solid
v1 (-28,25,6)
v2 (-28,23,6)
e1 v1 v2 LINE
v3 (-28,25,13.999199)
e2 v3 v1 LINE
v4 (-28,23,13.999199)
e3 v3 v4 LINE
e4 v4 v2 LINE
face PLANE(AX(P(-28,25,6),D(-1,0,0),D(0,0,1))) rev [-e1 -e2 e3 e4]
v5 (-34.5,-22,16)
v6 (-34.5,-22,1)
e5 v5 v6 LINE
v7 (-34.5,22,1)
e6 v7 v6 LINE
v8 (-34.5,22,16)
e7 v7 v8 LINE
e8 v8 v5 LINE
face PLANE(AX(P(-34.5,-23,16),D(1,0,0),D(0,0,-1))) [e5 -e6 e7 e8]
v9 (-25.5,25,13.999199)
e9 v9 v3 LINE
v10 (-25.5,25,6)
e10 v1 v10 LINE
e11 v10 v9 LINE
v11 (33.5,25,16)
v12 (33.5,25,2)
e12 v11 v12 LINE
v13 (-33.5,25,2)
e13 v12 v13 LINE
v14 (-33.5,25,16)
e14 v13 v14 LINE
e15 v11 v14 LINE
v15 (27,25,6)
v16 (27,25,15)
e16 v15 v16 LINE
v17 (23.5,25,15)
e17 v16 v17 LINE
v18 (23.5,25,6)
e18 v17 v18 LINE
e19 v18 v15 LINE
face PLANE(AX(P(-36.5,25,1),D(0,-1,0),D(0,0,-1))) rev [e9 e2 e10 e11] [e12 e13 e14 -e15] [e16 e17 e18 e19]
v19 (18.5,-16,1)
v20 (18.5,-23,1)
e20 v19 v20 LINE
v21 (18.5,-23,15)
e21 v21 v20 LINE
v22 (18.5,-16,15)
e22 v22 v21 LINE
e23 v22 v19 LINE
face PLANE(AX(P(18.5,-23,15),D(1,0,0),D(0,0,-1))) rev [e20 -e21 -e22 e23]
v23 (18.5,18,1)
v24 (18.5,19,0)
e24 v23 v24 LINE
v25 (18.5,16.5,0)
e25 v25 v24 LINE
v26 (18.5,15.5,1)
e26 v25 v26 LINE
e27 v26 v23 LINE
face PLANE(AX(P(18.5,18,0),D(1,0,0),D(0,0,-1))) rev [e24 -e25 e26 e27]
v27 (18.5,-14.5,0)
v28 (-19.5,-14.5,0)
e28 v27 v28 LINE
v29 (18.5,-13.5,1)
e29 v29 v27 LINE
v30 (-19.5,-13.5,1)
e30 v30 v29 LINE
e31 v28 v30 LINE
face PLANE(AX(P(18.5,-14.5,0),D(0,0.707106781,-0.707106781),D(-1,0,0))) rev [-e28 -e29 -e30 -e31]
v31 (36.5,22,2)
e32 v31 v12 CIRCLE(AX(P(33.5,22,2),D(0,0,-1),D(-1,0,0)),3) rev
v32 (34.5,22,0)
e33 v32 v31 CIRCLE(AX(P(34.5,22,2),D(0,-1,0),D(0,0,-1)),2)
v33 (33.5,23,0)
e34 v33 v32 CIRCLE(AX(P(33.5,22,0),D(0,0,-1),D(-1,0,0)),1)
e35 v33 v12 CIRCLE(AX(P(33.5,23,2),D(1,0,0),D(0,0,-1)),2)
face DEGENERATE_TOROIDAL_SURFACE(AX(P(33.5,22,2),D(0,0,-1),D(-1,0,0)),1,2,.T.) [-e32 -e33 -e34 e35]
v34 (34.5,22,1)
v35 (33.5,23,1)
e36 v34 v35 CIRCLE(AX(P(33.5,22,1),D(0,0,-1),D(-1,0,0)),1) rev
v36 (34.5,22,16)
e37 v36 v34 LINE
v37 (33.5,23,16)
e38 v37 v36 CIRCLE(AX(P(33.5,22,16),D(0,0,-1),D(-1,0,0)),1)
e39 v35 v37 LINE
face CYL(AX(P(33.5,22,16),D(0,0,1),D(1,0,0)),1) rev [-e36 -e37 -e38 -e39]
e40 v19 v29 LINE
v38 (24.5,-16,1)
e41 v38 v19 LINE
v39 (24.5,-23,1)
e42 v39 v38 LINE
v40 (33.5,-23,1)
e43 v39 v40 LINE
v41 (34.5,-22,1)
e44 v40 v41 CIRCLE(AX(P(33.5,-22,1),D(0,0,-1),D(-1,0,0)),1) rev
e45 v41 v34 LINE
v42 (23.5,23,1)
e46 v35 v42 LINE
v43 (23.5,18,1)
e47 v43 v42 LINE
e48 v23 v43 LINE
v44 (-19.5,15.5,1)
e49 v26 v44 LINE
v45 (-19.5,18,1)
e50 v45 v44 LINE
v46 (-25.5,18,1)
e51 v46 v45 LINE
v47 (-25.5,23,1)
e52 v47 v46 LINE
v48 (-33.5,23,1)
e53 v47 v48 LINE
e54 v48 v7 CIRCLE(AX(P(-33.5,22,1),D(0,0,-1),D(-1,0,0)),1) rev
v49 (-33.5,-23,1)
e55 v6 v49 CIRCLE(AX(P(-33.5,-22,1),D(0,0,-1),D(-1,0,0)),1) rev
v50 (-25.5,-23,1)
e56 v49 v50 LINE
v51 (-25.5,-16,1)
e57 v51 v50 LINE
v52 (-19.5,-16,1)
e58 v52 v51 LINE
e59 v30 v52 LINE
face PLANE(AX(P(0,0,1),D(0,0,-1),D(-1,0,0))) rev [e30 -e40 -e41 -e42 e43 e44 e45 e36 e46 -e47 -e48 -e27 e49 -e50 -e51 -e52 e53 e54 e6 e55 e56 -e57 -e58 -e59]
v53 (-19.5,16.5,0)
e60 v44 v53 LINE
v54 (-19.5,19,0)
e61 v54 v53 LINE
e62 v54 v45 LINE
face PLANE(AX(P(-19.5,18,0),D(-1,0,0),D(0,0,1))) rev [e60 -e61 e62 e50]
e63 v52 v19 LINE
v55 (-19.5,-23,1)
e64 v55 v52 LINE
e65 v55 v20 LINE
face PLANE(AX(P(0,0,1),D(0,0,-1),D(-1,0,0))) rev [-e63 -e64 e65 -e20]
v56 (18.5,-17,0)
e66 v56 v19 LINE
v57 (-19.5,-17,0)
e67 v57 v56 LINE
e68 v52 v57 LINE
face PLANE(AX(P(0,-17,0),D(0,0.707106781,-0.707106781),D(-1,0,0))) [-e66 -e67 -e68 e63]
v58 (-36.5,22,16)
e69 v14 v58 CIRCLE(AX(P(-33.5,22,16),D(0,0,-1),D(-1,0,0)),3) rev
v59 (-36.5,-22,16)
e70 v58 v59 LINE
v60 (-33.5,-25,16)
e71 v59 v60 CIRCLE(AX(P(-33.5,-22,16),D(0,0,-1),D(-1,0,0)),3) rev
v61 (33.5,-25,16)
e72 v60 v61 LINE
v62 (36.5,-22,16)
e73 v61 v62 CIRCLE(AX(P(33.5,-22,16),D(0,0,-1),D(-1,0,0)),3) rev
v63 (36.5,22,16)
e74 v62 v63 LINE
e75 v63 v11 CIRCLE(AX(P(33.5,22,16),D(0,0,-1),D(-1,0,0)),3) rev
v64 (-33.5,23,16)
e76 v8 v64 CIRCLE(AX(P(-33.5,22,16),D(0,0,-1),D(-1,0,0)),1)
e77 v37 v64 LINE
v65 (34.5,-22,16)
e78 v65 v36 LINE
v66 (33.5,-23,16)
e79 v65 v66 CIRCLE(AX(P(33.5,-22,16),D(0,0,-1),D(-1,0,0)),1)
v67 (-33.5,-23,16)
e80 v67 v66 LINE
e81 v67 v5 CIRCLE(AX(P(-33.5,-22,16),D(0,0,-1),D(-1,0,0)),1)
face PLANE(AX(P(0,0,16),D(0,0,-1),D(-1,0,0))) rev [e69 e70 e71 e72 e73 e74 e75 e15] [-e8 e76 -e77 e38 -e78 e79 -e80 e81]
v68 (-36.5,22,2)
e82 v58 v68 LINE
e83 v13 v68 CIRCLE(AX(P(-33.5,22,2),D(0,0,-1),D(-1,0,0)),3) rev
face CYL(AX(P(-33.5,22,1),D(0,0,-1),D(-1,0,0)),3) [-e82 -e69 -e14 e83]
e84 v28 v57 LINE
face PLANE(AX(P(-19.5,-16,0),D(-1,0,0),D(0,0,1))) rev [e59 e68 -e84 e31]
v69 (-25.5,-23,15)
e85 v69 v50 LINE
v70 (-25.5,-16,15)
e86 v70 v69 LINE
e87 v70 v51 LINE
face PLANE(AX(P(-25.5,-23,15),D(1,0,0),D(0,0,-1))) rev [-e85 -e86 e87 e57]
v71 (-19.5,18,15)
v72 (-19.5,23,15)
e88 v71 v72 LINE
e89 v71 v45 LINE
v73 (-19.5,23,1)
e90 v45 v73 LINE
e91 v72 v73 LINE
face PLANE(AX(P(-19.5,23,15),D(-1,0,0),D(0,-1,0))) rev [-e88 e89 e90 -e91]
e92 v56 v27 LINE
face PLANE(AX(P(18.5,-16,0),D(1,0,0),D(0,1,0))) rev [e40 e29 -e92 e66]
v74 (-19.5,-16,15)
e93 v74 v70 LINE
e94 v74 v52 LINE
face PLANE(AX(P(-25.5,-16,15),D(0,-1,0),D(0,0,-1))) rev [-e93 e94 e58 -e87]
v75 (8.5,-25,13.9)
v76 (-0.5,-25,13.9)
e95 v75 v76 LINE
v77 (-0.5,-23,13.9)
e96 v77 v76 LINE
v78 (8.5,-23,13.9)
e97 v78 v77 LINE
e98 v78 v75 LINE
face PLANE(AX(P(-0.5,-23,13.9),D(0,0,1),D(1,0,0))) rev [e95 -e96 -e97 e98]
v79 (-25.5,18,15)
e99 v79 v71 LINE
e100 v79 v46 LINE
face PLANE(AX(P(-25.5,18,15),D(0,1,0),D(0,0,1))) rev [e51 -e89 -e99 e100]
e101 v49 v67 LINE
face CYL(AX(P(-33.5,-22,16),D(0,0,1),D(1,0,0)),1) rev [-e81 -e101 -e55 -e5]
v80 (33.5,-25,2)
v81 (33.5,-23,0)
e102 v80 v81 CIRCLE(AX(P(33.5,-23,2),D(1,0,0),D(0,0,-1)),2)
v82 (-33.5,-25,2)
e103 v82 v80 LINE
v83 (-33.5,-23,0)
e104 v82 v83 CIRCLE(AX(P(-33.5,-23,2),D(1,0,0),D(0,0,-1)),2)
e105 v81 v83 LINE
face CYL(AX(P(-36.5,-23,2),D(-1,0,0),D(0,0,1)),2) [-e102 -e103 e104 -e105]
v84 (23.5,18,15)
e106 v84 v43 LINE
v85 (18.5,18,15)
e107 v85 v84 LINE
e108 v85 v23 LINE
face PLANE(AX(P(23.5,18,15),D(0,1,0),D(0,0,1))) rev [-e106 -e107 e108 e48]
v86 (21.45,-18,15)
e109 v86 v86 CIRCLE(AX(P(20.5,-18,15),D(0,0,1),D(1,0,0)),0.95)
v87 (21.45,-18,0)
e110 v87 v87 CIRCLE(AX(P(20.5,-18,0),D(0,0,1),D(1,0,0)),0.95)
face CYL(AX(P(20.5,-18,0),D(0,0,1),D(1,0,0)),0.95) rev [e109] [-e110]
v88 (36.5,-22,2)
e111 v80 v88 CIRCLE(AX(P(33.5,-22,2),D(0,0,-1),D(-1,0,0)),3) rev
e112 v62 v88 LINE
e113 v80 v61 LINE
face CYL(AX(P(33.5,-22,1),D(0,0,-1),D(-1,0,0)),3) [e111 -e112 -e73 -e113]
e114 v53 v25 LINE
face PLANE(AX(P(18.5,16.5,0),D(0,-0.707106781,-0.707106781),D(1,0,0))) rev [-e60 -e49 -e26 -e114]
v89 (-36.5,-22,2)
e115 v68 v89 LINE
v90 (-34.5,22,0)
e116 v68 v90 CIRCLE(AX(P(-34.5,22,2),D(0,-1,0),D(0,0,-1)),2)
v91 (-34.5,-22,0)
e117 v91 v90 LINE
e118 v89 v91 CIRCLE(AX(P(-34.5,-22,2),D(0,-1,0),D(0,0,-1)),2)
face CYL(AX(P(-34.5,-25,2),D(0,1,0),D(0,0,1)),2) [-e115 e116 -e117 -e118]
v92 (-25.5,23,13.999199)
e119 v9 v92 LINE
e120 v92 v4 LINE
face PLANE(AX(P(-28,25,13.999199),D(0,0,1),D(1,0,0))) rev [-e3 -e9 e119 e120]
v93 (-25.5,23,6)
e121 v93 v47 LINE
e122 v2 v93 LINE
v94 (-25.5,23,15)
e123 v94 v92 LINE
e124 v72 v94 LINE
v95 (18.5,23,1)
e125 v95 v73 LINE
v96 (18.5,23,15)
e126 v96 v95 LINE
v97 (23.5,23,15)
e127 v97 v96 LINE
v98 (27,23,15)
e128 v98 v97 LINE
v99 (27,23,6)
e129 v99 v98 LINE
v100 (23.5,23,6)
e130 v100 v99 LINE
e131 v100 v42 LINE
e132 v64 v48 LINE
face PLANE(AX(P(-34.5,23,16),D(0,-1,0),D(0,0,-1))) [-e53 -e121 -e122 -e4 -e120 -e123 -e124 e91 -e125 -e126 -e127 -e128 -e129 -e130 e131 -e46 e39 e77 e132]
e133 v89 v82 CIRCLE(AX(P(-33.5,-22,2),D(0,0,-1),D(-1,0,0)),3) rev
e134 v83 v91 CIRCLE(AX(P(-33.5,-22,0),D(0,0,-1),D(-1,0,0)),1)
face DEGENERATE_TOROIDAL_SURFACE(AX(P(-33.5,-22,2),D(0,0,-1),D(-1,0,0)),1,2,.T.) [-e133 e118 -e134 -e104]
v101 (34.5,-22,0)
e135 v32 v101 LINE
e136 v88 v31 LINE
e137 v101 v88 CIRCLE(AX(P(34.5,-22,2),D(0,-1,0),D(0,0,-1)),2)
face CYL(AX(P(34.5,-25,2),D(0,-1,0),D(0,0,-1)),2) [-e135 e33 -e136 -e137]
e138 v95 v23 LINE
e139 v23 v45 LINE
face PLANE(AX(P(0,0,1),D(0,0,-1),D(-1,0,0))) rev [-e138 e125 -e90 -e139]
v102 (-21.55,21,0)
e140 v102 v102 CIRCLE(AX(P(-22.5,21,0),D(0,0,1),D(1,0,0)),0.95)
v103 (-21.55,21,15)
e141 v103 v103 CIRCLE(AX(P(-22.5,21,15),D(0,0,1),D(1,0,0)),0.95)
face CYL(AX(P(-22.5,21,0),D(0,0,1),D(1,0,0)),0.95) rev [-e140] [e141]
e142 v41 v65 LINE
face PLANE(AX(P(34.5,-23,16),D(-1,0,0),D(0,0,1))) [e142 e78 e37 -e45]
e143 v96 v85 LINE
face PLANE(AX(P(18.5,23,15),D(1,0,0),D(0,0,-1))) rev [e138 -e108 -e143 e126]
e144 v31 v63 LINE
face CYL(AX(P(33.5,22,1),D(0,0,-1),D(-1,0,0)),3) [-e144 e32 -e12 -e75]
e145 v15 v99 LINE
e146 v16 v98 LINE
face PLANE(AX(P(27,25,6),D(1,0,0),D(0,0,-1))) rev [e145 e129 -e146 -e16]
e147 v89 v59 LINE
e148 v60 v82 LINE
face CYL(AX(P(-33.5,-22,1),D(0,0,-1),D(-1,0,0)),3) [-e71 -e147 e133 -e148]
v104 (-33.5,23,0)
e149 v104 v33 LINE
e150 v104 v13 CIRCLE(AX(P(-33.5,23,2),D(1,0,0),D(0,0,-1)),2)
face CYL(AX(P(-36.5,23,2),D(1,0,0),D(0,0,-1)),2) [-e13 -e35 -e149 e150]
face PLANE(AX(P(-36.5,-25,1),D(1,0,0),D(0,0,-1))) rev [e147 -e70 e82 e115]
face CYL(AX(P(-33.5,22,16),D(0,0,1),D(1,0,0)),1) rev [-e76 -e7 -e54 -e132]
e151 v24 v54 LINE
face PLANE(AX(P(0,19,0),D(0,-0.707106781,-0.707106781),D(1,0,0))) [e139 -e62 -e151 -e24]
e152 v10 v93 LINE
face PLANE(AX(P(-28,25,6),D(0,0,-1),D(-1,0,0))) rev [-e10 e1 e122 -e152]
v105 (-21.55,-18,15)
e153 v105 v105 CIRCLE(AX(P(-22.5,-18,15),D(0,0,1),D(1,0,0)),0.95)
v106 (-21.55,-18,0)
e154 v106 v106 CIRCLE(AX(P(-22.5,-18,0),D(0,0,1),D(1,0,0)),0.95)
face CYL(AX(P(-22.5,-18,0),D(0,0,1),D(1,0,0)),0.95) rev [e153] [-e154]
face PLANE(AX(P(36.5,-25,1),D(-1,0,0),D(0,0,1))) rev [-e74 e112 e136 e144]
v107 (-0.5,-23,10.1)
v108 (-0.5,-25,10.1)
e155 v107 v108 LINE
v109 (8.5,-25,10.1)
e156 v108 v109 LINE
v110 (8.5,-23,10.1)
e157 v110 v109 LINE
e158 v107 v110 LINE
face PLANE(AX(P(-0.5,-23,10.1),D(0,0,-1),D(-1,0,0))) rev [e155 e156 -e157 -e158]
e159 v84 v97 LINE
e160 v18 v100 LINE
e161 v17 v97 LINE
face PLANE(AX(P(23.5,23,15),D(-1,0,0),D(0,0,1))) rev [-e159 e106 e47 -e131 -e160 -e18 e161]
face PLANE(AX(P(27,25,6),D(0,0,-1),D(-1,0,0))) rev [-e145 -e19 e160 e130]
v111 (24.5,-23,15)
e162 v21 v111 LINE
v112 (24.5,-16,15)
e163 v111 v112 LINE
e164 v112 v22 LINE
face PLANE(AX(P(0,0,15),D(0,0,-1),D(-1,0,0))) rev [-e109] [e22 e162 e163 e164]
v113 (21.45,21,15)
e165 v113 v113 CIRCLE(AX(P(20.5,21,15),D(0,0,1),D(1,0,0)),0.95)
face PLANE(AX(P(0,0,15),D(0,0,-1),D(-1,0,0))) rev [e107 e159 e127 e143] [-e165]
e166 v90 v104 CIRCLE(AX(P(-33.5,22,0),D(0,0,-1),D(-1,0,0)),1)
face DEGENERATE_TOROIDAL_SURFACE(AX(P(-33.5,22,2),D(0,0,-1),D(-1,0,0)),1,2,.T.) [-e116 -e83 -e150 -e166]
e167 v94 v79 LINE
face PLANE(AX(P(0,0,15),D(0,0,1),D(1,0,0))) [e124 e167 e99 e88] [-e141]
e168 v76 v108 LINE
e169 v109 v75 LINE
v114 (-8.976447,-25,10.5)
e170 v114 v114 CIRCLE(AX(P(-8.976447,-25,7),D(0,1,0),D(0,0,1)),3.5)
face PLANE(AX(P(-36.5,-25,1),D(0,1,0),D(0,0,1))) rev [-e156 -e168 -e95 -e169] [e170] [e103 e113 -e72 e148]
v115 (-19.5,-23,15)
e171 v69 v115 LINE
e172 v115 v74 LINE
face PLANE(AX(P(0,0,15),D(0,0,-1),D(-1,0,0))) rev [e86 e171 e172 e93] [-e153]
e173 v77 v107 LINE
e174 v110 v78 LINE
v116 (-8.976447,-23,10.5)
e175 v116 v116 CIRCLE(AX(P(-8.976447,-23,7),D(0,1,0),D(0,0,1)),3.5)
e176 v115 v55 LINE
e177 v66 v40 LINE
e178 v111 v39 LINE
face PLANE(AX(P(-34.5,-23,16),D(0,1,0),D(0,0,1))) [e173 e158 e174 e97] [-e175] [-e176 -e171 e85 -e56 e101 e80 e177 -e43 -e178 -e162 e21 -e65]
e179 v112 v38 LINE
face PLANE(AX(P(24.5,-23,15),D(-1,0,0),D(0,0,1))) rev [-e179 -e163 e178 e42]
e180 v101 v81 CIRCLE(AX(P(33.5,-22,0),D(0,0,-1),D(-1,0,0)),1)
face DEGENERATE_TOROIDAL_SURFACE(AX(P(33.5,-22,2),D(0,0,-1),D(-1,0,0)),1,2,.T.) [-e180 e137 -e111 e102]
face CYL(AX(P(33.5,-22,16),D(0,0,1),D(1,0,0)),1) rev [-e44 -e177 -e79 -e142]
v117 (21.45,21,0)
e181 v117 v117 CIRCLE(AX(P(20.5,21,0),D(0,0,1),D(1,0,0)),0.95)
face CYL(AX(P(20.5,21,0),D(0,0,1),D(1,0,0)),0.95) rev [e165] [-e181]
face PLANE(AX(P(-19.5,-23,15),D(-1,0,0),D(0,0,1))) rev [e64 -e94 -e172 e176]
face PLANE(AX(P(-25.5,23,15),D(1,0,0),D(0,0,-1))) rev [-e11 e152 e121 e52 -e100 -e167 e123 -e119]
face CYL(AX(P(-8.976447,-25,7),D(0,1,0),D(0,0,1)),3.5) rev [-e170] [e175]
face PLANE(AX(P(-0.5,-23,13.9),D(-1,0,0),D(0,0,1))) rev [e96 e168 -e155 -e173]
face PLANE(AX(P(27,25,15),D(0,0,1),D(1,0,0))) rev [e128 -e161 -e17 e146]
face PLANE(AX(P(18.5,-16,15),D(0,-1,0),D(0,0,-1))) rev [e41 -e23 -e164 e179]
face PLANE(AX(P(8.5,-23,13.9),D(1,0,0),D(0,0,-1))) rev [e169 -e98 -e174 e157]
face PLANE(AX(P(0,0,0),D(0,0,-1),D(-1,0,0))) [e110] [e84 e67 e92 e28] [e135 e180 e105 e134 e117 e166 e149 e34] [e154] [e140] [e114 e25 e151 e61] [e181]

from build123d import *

# Parameters (mm, degrees)
SKETCH1_W           = 73
SKETCH1_H           = 50
BOSS_EXTRUDE1_DEPTH = 1
SKETCH2_W           = 73
SKETCH2_H           = 50
SKETCH2_W_2         = 69
SKETCH2_H_2         = 46
BOSS_EXTRUDE2_DEPTH = 15
FILLET1_R           = 3
FILLET2_R           = 1
SKETCH3_W           = 9
SKETCH3_H           = 3.8
CUT_EXTRUDE1_DEPTH  = 2
SKETCH5_R           = 3.5
CUT_EXTRUDE2_DEPTH  = 2
SKETCH6_W           = 6
SKETCH6_H           = 5
SKETCH6_W_2         = 5
BOSS_EXTRUDE3_DEPTH = 14
SKETCH7_W           = 6
SKETCH7_H           = 7
BOSS_EXTRUDE4_DEPTH = 14
FILLET3_R           = 2
SKETCH8_W           = 2.5
SKETCH8_H           = 7.999199493
SKETCH8_W_2         = 3.5
SKETCH8_H_2         = 9
CUT_EXTRUDE3_DEPTH  = 63.387899545
SKETCH9_R           = 0.95
CUT_EXTRUDE4_DEPTH  = 47.714558812
SKETCH10_W          = 38
SKETCH10_H          = 1.5
CUT_EXTRUDE5_DEPTH  = 47.714558812
CHAMFER1_SIZE       = 1
CHAMFER2_SIZE       = 1


with BuildPart() as part:
    # Sketch1 → Boss-Extrude1 (new body)
    with BuildSketch(Plane.XY):
        Rectangle(SKETCH1_W, SKETCH1_H)
    extrude(amount=BOSS_EXTRUDE1_DEPTH)

    # Sketch2 → Boss-Extrude2 (add)
    with BuildSketch(Plane.XY.offset(1)):
        Rectangle(SKETCH2_W, SKETCH2_H)
        Rectangle(SKETCH2_W_2, SKETCH2_H_2, mode=Mode.SUBTRACT)
    extrude(amount=BOSS_EXTRUDE2_DEPTH)

    # Fillet1
    fillet1_edges = [part.edges().sort_by_distance(p)[0] for p in [
        (36.5, -25, 8),
        (-36.5, -25, 8),
        (-36.5, 25, 8),
        (36.5, 25, 8),
    ]]
    fillet(fillet1_edges, radius=FILLET1_R)

    # Fillet2
    fillet2_edges = [part.edges().sort_by_distance(p)[0] for p in [
        (34.5, 23, 8.5),
        (-34.5, 23, 8.5),
        (-34.5, -23, 8.5),
        (34.5, -23, 8.5),
    ]]
    fillet(fillet2_edges, radius=FILLET2_R)

    # Sketch3 → Cut-Extrude1 (cut)
    with BuildSketch(Plane.XZ.offset(25)):
        with Locations((4, 12)):
            Rectangle(SKETCH3_W, SKETCH3_H)
    extrude(amount=-CUT_EXTRUDE1_DEPTH, mode=Mode.SUBTRACT)

    # Sketch5 → Cut-Extrude2 (cut)
    with BuildSketch(Plane(origin=(0, -23, 0), x_dir=(1, 0, 0), z_dir=(0, 1, 0))):
        with Locations(Location((-8.976447348, -7, 0), (0, 0, 270))):
            Circle(SKETCH5_R)
    extrude(amount=-CUT_EXTRUDE2_DEPTH, mode=Mode.SUBTRACT)

    # Sketch6 → Boss-Extrude3 (add)
    with BuildSketch(Plane.XY.offset(1)):
        with Locations((-22.5, 20.5)):
            Rectangle(SKETCH6_W, SKETCH6_H)
        with Locations((21, 20.5)):
            Rectangle(SKETCH6_W_2, SKETCH6_H)
    extrude(amount=BOSS_EXTRUDE3_DEPTH)

    # Sketch7 → Boss-Extrude4 (add)
    with BuildSketch(Plane.XY.offset(1)):
        with Locations((21.5, -19.5)):
            Rectangle(SKETCH7_W, SKETCH7_H)
        with Locations((-22.5, -19.5)):
            Rectangle(SKETCH7_W, SKETCH7_H)
    extrude(amount=BOSS_EXTRUDE4_DEPTH)

    # Fillet3
    fillet3_edges = [part.edges().sort_by_distance(p)[0] for p in [
        (-36.5, 0, 0),
        (36.5, 0, 0),
        (0, -25, 0),
        (0, 25, 0),
        (35.621320344, -24.121320344, 0),
        (35.621320344, 24.121320344, 0),
        (-35.621320344, -24.121320344, 0),
        (-35.621320344, 24.121320344, 0),
    ]]
    fillet(fillet3_edges, radius=FILLET3_R)

    # Sketch8 → Cut-Extrude3 (cut, through all)
    with BuildSketch(Plane.XZ.offset(-23)):
        with Locations((-26.75, 9.999599746)):
            Rectangle(SKETCH8_W, SKETCH8_H)
        with Locations((25.25, 10.5)):
            Rectangle(SKETCH8_W_2, SKETCH8_H_2)
    extrude(amount=-CUT_EXTRUDE3_DEPTH, mode=Mode.SUBTRACT)

    # Sketch9 → Cut-Extrude4 (cut, through all)
    with BuildSketch(Plane.XY.offset(15)):
        with Locations((-22.5, 21)):
            Circle(SKETCH9_R)
        with Locations((20.5, 21)):
            Circle(SKETCH9_R)
        with Locations((20.5, -18)):
            Circle(SKETCH9_R)
        with Locations((-22.5, -18)):
            Circle(SKETCH9_R)
    extrude(amount=-CUT_EXTRUDE4_DEPTH, mode=Mode.SUBTRACT)

    # Sketch10 → Cut-Extrude5 (cut, through all)
    with BuildSketch(Plane.XY.offset(1)):
        with Locations((-0.5, 17.25)):
            Rectangle(SKETCH10_W, SKETCH10_H)
        with Locations((-0.5, -15.25)):
            Rectangle(SKETCH10_W, SKETCH10_H)
    extrude(amount=-CUT_EXTRUDE5_DEPTH, mode=Mode.SUBTRACT)

    # Chamfer1
    chamfer1_edges = [part.edges().sort_by_distance(p)[0] for p in [
        (-0.5, -16, 0),
        (-0.5, 18, 0),
    ]]
    chamfer(chamfer1_edges, length=CHAMFER1_SIZE - 0.0001)  # a hair under: the kernel refuses the full size

    # Chamfer2
    chamfer2_edges = [part.edges().sort_by_distance(p)[0] for p in [
        (-0.5, 16.5, 1),
        (-0.5, -14.5, 1),
    ]]
    chamfer(chamfer2_edges, length=CHAMFER2_SIZE - 0.0001)  # a hair under: the kernel refuses the full size


solid = part.part
